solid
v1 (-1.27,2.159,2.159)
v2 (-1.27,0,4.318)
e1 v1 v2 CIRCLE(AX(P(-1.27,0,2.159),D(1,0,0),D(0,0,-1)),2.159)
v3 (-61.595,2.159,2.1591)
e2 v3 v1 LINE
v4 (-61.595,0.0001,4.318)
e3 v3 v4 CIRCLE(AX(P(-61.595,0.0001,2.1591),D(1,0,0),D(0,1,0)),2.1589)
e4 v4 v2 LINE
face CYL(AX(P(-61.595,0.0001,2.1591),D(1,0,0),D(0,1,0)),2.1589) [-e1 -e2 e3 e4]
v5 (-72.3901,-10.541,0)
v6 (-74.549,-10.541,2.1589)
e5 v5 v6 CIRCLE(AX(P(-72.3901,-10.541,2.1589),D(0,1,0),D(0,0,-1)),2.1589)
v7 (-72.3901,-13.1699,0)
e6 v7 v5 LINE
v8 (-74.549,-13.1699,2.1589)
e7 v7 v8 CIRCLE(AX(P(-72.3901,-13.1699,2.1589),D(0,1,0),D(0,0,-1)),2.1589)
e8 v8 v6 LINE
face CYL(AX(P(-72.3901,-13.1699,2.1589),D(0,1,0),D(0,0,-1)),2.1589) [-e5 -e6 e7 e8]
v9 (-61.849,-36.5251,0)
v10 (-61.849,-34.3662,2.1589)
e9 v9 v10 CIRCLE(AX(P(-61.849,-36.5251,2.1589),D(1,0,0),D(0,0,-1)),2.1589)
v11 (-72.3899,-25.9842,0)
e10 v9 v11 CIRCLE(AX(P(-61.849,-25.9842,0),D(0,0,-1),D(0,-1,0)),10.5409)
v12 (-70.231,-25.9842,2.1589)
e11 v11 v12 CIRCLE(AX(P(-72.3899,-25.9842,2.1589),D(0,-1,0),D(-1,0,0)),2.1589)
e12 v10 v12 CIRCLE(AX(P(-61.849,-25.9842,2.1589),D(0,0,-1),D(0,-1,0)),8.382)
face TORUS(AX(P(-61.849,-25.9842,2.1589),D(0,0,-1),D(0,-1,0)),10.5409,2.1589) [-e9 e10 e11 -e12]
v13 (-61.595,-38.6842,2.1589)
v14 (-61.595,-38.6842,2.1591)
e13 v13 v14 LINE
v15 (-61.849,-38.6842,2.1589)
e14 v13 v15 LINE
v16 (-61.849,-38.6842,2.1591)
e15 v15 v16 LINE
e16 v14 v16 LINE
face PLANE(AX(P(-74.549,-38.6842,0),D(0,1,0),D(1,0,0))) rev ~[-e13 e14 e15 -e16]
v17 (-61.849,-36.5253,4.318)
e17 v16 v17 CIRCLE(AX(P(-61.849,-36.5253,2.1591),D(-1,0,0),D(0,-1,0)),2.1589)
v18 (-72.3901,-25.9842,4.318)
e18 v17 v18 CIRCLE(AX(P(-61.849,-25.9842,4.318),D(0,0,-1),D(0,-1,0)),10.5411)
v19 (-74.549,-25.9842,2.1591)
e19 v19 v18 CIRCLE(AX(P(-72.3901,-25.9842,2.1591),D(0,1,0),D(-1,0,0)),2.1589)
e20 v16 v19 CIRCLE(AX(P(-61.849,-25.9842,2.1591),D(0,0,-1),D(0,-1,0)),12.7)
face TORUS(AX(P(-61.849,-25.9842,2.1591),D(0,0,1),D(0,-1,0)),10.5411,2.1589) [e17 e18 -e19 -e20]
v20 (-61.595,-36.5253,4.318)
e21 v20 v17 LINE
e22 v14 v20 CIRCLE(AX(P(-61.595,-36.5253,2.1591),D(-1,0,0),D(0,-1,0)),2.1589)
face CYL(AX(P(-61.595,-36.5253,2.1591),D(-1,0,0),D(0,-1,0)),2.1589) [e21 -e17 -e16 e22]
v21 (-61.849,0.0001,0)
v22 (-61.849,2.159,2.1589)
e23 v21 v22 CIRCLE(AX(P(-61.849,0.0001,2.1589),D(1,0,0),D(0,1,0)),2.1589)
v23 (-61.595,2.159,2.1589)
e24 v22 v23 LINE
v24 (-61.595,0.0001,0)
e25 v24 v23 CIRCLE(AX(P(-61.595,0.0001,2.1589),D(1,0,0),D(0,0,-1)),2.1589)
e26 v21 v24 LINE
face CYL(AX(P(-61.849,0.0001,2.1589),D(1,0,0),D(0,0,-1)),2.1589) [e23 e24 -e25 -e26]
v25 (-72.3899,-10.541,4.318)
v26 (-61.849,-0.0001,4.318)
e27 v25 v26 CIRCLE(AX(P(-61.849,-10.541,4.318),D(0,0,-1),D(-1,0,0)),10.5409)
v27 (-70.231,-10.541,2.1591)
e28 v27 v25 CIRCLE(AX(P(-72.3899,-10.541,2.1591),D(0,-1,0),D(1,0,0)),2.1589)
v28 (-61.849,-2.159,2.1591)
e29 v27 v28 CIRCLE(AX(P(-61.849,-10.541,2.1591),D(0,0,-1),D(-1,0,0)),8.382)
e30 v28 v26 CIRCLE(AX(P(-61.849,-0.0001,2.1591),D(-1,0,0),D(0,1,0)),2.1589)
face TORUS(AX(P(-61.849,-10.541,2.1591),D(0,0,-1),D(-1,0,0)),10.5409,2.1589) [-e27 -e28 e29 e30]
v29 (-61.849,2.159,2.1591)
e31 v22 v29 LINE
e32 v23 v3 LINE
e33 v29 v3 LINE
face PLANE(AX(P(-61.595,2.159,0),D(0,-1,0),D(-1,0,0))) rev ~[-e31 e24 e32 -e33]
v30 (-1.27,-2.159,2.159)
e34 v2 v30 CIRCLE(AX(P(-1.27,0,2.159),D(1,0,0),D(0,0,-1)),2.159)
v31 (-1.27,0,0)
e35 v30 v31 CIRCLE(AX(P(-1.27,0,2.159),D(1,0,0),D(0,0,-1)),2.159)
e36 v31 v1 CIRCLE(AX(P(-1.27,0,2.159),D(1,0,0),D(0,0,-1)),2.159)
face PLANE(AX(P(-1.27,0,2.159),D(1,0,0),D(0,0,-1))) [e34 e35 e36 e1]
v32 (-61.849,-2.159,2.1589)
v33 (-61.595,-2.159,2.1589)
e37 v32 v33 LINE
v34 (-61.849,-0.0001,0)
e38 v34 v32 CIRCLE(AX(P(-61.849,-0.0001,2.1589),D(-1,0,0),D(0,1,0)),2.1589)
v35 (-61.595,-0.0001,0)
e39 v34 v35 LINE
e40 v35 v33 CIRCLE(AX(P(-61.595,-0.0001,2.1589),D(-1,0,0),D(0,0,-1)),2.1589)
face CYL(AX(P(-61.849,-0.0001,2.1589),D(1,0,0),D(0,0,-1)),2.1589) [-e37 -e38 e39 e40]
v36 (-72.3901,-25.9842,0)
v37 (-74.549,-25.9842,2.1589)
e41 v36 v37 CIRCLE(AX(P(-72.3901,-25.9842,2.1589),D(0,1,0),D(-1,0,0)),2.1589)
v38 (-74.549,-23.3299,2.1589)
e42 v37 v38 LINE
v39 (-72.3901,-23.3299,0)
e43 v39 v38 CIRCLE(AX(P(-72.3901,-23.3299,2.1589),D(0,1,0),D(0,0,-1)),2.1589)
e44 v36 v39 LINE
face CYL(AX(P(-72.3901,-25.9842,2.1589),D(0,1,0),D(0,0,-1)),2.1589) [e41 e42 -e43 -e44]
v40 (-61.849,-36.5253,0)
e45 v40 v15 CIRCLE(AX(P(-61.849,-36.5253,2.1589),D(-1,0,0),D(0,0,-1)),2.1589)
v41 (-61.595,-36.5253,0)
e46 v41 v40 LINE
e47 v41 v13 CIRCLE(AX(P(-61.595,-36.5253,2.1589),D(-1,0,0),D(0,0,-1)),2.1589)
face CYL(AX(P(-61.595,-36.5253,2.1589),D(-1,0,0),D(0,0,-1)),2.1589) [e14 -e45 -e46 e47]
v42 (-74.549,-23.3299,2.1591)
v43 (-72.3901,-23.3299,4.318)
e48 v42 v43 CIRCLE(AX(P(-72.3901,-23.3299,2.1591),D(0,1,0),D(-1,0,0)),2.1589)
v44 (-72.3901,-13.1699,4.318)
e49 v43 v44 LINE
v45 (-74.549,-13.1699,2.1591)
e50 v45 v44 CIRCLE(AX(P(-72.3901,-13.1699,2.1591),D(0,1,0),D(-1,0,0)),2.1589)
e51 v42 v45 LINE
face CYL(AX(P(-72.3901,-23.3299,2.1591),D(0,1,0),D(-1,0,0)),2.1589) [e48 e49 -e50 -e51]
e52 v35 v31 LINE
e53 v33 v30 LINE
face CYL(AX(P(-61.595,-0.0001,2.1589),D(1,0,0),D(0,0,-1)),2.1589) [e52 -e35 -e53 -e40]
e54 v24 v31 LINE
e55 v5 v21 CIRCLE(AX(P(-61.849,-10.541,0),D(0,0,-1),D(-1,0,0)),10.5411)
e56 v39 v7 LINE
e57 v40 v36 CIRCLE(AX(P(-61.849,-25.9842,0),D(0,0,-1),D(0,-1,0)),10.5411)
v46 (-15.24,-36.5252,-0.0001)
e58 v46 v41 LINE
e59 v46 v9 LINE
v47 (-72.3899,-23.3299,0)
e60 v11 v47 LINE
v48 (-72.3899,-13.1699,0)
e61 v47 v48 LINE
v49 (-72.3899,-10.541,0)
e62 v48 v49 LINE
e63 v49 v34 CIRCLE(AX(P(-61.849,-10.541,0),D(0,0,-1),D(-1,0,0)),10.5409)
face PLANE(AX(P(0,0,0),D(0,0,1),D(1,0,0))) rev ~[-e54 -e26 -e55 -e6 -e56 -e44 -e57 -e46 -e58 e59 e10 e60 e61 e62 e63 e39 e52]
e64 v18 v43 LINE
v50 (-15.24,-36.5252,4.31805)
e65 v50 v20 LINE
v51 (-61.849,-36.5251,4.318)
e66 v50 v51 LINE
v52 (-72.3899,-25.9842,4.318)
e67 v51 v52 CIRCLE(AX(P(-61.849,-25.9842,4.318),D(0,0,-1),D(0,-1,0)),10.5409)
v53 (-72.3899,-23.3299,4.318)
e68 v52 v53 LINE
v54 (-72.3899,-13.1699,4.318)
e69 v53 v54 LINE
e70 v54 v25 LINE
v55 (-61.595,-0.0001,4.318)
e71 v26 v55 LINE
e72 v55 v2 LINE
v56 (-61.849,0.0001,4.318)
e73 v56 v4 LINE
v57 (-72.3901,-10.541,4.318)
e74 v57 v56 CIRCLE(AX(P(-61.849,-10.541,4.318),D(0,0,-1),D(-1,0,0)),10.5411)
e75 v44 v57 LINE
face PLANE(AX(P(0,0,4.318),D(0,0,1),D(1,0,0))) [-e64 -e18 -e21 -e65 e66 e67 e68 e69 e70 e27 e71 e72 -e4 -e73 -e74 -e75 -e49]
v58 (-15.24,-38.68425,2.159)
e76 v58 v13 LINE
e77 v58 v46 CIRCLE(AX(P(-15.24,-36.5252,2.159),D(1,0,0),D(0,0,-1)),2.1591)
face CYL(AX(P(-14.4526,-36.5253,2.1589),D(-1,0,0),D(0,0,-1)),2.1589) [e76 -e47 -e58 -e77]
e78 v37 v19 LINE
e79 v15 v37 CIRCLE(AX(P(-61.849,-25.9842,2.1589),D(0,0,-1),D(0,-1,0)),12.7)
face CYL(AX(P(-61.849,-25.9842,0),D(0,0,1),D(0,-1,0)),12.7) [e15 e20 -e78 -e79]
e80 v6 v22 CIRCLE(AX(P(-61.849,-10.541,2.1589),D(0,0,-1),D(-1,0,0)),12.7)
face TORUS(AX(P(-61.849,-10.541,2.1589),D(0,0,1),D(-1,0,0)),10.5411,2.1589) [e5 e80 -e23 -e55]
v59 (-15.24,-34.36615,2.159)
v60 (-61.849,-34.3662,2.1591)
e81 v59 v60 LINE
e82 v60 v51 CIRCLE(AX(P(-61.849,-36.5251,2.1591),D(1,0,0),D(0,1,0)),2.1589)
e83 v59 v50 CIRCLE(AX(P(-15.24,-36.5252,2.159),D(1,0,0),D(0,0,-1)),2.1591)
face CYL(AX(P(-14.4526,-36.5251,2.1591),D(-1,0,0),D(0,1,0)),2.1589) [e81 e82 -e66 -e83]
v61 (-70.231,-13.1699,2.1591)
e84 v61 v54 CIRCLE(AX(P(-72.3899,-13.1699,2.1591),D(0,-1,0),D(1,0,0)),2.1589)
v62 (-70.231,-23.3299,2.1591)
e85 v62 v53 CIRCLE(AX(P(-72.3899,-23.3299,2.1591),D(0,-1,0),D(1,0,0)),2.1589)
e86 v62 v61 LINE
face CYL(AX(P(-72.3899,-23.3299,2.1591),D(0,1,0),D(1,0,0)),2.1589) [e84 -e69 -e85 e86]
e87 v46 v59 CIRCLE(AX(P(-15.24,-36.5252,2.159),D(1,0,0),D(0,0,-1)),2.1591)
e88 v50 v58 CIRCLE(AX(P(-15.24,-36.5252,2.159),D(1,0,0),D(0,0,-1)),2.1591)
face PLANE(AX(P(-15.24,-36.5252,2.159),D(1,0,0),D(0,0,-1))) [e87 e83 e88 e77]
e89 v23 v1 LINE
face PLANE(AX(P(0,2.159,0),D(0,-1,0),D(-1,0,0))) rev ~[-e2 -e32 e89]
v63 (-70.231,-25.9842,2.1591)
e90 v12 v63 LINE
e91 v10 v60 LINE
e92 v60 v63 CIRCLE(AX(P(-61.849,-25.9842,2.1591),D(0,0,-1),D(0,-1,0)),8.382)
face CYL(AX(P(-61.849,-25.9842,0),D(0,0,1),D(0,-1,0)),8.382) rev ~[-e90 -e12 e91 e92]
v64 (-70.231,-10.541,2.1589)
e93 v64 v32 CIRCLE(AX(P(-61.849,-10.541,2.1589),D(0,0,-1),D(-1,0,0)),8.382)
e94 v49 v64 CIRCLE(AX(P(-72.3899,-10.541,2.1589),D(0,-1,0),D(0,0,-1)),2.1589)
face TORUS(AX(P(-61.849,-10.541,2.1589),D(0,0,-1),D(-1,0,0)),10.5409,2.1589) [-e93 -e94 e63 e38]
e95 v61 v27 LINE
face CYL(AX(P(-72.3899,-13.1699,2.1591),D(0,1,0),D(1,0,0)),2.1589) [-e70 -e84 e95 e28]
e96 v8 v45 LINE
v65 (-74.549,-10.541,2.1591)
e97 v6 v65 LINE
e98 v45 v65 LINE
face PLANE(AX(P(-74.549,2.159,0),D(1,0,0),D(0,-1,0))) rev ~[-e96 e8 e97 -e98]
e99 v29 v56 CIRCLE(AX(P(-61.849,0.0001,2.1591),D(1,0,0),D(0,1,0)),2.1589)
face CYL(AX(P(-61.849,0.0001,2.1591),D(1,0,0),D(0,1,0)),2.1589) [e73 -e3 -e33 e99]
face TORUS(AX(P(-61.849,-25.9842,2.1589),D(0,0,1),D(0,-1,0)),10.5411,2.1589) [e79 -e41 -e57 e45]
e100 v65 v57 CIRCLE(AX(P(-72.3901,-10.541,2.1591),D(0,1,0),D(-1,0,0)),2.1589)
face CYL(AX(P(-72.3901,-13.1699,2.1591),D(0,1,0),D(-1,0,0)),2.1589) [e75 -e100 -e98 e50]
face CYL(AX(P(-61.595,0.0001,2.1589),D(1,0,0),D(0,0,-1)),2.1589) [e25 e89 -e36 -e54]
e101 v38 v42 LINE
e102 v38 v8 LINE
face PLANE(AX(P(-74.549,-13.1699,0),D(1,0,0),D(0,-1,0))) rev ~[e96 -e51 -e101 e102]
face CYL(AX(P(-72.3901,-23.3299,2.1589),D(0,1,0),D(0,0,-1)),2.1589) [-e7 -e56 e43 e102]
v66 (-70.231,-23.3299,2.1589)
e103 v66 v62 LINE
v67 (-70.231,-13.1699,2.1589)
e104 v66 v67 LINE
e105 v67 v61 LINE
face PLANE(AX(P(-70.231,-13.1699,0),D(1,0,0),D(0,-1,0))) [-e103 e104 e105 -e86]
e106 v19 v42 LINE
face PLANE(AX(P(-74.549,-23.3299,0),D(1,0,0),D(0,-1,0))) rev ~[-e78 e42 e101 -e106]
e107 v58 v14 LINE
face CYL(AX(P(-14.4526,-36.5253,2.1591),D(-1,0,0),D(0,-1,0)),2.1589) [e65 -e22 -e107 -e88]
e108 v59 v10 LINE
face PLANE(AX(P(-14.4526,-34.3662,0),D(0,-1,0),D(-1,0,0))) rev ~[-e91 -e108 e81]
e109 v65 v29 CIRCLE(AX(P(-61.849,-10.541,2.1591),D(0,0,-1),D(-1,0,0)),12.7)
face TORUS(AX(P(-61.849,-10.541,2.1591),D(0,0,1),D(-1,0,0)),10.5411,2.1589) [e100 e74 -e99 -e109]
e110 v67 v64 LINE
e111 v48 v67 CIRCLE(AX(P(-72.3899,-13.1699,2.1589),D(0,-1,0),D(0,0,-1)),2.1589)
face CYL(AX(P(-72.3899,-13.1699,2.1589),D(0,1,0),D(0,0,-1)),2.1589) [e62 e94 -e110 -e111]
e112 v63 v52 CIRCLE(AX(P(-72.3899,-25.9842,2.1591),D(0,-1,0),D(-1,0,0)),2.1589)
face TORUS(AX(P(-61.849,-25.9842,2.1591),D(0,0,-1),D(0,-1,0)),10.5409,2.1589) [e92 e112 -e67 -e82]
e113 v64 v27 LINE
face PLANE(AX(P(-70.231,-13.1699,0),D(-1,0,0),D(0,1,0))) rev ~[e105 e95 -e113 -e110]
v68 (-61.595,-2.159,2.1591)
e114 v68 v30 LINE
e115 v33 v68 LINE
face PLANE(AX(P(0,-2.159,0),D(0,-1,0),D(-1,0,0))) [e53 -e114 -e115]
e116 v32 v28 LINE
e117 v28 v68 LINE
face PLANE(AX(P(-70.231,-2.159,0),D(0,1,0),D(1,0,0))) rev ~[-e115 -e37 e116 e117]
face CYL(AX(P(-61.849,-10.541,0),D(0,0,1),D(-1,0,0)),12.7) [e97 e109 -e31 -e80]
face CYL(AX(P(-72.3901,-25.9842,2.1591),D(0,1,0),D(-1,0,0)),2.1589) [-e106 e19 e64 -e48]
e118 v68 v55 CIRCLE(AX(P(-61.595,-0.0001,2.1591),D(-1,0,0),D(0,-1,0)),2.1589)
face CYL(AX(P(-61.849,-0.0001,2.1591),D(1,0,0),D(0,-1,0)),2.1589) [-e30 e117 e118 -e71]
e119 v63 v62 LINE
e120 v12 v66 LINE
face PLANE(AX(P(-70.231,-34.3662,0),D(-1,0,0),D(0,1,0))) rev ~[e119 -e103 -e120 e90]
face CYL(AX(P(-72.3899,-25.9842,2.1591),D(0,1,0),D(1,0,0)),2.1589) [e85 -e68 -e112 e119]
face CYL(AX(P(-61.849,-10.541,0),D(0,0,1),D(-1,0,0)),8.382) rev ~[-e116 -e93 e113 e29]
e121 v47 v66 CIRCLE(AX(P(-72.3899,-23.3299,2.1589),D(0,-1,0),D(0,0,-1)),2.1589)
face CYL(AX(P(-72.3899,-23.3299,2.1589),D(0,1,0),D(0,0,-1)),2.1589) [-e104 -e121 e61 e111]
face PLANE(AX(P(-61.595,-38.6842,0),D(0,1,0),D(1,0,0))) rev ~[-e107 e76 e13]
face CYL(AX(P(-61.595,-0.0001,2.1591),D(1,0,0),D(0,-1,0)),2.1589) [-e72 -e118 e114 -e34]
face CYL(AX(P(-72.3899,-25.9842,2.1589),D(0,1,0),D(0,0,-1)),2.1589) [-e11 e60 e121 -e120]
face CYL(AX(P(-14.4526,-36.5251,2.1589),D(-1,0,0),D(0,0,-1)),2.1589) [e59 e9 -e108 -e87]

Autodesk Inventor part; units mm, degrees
ref_plane "YZ Plane" through (0, 0, 0) normal (1, 0, 0) x (0, 1, 0)
ref_plane "XZ Plane" through (0, 0, 0) normal (0, 1, 0) x (-1, 0, 0)
ref_plane "XY Plane" through (0, 0, 0) normal (0, 0, 1) x (1, 0, 0)
sketch "Sketch1" plane through (0, 0, 0) normal (0, 0, 1) x (1, 0, 0)
  line L0 (0, 2.159) -> (0, -2.159)
  line L1 (0, -2.159) -> (-61.595, -2.159)
  line L2 (0, 2.159) -> (-61.595, 2.159)
  line L3 (-61.595, -38.6842) -> (-14.4526, -38.6842)
  line L4 (-70.231, -13.1699) -> (-70.231, -23.3299)
  line L5 (-74.549, -13.1699) -> (-74.549, -23.3299)
  line L6 (-70.231, -13.1699) -> (-70.231, -2.159)
  line L7 (-70.231, -2.159) -> (-61.595, -2.159)
  line L8 (-61.595, 2.159) -> (-74.549, 2.159)
  line L9 (-74.549, 2.159) -> (-74.549, -13.1699)
  line L10 (-74.549, -23.3299) -> (-74.549, -38.6842)
  line L11 (-74.549, -38.6842) -> (-61.595, -38.6842)
  line L12 (-14.4526, -34.3662) -> (-14.4526, -36.5252)
  line L13 (-14.4526, -36.5252) -> (-14.4526, -38.6842)
  line L14 (-14.4526, -34.3662) -> (-70.231, -34.3662)
  line L15 (-70.231, -34.3662) -> (-70.231, -23.3299)
  point P0 (0, 0)
  point P1 (0, 0)
  point P2 (-61.595, 0)
  point P3 (-72.39, -18.2499)
  point P4 (-72.39, -13.1699)
  point P5 (-72.39, -23.3299)
  dimension "d0" = 61.595
  dimension "d1" = 18.2499
  dimension "d2" = 10.795
  dimension "d3" = 5.08
  dimension "d4" = 5.08
  dimension "d8" = 2.159
  dimension "d9" = 2.159
  dimension "d14" = 2.159
  dimension "d15" = 2.159
  dimension "d34" = 2.159
  dimension "d35" = 47.1424
  dimension "d36" = 36.5252
extrude "Extrusion1" add sketch "Sketch1" along normal blind 4.318
fillet "Fillet10" radius 12.7 2 edges at (-74.549, 2.159, 2.159) (-74.549, -38.6842, 2.159)
fillet "Fillet11" radius 8.382 2 edges at (-70.231, -34.3662, 2.159) (-70.231, -2.159, 2.159)
fillet "Fillet12" radius 2.159 20 edges at (-70.8293, -1.5607, 0) (-74.549, -18.2499, 0) (-70.8293, -34.9645, 0) (-38.0238, -38.6842, 0) (-30.7975, 2.159, 0) (-70.8293, -1.5607, 4.318) (-74.549, -18.2499, 4.318) (-70.8293, -34.9645, 4.318) (-38.0238, -38.6842, 4.318) (-61.722, 2.159, 4.318) (-67.776, -31.9112, 4.318) (-70.231, -18.2499, 4.318) (-67.776, -4.614, 4.318) (-30.7975, -2.159, 4.318) (-38.1508, -34.3662, 4.318) (-67.776, -31.9112, 0) (-70.231, -18.2499, 0) (-67.776, -4.614, 0) (-30.7975, -2.159, 0) (-38.1508, -34.3662, 0)
sketch "Sketch5" plane through (0, 0, 2.159) normal (1, 0, 0) x (0, 0, -1)
  circle A0 centre (0, 0) radius 2.159
  point P0 (2.159, 0)
extrude "Extrusion5" cut sketch "Sketch5" against normal blind 1.27
sketch "Sketch6" plane through (-14.4526, -36.5252, 2.159) normal (1, 0, 0) x (0, 0, -1)
  circle A0 centre (0, 0) radius 2.1591
  point P0 (2.159, 36.5252)
extrude "Extrusion6" cut sketch "Sketch6" against normal blind 0.7874
properties part number "Water_tube" material "Water"
